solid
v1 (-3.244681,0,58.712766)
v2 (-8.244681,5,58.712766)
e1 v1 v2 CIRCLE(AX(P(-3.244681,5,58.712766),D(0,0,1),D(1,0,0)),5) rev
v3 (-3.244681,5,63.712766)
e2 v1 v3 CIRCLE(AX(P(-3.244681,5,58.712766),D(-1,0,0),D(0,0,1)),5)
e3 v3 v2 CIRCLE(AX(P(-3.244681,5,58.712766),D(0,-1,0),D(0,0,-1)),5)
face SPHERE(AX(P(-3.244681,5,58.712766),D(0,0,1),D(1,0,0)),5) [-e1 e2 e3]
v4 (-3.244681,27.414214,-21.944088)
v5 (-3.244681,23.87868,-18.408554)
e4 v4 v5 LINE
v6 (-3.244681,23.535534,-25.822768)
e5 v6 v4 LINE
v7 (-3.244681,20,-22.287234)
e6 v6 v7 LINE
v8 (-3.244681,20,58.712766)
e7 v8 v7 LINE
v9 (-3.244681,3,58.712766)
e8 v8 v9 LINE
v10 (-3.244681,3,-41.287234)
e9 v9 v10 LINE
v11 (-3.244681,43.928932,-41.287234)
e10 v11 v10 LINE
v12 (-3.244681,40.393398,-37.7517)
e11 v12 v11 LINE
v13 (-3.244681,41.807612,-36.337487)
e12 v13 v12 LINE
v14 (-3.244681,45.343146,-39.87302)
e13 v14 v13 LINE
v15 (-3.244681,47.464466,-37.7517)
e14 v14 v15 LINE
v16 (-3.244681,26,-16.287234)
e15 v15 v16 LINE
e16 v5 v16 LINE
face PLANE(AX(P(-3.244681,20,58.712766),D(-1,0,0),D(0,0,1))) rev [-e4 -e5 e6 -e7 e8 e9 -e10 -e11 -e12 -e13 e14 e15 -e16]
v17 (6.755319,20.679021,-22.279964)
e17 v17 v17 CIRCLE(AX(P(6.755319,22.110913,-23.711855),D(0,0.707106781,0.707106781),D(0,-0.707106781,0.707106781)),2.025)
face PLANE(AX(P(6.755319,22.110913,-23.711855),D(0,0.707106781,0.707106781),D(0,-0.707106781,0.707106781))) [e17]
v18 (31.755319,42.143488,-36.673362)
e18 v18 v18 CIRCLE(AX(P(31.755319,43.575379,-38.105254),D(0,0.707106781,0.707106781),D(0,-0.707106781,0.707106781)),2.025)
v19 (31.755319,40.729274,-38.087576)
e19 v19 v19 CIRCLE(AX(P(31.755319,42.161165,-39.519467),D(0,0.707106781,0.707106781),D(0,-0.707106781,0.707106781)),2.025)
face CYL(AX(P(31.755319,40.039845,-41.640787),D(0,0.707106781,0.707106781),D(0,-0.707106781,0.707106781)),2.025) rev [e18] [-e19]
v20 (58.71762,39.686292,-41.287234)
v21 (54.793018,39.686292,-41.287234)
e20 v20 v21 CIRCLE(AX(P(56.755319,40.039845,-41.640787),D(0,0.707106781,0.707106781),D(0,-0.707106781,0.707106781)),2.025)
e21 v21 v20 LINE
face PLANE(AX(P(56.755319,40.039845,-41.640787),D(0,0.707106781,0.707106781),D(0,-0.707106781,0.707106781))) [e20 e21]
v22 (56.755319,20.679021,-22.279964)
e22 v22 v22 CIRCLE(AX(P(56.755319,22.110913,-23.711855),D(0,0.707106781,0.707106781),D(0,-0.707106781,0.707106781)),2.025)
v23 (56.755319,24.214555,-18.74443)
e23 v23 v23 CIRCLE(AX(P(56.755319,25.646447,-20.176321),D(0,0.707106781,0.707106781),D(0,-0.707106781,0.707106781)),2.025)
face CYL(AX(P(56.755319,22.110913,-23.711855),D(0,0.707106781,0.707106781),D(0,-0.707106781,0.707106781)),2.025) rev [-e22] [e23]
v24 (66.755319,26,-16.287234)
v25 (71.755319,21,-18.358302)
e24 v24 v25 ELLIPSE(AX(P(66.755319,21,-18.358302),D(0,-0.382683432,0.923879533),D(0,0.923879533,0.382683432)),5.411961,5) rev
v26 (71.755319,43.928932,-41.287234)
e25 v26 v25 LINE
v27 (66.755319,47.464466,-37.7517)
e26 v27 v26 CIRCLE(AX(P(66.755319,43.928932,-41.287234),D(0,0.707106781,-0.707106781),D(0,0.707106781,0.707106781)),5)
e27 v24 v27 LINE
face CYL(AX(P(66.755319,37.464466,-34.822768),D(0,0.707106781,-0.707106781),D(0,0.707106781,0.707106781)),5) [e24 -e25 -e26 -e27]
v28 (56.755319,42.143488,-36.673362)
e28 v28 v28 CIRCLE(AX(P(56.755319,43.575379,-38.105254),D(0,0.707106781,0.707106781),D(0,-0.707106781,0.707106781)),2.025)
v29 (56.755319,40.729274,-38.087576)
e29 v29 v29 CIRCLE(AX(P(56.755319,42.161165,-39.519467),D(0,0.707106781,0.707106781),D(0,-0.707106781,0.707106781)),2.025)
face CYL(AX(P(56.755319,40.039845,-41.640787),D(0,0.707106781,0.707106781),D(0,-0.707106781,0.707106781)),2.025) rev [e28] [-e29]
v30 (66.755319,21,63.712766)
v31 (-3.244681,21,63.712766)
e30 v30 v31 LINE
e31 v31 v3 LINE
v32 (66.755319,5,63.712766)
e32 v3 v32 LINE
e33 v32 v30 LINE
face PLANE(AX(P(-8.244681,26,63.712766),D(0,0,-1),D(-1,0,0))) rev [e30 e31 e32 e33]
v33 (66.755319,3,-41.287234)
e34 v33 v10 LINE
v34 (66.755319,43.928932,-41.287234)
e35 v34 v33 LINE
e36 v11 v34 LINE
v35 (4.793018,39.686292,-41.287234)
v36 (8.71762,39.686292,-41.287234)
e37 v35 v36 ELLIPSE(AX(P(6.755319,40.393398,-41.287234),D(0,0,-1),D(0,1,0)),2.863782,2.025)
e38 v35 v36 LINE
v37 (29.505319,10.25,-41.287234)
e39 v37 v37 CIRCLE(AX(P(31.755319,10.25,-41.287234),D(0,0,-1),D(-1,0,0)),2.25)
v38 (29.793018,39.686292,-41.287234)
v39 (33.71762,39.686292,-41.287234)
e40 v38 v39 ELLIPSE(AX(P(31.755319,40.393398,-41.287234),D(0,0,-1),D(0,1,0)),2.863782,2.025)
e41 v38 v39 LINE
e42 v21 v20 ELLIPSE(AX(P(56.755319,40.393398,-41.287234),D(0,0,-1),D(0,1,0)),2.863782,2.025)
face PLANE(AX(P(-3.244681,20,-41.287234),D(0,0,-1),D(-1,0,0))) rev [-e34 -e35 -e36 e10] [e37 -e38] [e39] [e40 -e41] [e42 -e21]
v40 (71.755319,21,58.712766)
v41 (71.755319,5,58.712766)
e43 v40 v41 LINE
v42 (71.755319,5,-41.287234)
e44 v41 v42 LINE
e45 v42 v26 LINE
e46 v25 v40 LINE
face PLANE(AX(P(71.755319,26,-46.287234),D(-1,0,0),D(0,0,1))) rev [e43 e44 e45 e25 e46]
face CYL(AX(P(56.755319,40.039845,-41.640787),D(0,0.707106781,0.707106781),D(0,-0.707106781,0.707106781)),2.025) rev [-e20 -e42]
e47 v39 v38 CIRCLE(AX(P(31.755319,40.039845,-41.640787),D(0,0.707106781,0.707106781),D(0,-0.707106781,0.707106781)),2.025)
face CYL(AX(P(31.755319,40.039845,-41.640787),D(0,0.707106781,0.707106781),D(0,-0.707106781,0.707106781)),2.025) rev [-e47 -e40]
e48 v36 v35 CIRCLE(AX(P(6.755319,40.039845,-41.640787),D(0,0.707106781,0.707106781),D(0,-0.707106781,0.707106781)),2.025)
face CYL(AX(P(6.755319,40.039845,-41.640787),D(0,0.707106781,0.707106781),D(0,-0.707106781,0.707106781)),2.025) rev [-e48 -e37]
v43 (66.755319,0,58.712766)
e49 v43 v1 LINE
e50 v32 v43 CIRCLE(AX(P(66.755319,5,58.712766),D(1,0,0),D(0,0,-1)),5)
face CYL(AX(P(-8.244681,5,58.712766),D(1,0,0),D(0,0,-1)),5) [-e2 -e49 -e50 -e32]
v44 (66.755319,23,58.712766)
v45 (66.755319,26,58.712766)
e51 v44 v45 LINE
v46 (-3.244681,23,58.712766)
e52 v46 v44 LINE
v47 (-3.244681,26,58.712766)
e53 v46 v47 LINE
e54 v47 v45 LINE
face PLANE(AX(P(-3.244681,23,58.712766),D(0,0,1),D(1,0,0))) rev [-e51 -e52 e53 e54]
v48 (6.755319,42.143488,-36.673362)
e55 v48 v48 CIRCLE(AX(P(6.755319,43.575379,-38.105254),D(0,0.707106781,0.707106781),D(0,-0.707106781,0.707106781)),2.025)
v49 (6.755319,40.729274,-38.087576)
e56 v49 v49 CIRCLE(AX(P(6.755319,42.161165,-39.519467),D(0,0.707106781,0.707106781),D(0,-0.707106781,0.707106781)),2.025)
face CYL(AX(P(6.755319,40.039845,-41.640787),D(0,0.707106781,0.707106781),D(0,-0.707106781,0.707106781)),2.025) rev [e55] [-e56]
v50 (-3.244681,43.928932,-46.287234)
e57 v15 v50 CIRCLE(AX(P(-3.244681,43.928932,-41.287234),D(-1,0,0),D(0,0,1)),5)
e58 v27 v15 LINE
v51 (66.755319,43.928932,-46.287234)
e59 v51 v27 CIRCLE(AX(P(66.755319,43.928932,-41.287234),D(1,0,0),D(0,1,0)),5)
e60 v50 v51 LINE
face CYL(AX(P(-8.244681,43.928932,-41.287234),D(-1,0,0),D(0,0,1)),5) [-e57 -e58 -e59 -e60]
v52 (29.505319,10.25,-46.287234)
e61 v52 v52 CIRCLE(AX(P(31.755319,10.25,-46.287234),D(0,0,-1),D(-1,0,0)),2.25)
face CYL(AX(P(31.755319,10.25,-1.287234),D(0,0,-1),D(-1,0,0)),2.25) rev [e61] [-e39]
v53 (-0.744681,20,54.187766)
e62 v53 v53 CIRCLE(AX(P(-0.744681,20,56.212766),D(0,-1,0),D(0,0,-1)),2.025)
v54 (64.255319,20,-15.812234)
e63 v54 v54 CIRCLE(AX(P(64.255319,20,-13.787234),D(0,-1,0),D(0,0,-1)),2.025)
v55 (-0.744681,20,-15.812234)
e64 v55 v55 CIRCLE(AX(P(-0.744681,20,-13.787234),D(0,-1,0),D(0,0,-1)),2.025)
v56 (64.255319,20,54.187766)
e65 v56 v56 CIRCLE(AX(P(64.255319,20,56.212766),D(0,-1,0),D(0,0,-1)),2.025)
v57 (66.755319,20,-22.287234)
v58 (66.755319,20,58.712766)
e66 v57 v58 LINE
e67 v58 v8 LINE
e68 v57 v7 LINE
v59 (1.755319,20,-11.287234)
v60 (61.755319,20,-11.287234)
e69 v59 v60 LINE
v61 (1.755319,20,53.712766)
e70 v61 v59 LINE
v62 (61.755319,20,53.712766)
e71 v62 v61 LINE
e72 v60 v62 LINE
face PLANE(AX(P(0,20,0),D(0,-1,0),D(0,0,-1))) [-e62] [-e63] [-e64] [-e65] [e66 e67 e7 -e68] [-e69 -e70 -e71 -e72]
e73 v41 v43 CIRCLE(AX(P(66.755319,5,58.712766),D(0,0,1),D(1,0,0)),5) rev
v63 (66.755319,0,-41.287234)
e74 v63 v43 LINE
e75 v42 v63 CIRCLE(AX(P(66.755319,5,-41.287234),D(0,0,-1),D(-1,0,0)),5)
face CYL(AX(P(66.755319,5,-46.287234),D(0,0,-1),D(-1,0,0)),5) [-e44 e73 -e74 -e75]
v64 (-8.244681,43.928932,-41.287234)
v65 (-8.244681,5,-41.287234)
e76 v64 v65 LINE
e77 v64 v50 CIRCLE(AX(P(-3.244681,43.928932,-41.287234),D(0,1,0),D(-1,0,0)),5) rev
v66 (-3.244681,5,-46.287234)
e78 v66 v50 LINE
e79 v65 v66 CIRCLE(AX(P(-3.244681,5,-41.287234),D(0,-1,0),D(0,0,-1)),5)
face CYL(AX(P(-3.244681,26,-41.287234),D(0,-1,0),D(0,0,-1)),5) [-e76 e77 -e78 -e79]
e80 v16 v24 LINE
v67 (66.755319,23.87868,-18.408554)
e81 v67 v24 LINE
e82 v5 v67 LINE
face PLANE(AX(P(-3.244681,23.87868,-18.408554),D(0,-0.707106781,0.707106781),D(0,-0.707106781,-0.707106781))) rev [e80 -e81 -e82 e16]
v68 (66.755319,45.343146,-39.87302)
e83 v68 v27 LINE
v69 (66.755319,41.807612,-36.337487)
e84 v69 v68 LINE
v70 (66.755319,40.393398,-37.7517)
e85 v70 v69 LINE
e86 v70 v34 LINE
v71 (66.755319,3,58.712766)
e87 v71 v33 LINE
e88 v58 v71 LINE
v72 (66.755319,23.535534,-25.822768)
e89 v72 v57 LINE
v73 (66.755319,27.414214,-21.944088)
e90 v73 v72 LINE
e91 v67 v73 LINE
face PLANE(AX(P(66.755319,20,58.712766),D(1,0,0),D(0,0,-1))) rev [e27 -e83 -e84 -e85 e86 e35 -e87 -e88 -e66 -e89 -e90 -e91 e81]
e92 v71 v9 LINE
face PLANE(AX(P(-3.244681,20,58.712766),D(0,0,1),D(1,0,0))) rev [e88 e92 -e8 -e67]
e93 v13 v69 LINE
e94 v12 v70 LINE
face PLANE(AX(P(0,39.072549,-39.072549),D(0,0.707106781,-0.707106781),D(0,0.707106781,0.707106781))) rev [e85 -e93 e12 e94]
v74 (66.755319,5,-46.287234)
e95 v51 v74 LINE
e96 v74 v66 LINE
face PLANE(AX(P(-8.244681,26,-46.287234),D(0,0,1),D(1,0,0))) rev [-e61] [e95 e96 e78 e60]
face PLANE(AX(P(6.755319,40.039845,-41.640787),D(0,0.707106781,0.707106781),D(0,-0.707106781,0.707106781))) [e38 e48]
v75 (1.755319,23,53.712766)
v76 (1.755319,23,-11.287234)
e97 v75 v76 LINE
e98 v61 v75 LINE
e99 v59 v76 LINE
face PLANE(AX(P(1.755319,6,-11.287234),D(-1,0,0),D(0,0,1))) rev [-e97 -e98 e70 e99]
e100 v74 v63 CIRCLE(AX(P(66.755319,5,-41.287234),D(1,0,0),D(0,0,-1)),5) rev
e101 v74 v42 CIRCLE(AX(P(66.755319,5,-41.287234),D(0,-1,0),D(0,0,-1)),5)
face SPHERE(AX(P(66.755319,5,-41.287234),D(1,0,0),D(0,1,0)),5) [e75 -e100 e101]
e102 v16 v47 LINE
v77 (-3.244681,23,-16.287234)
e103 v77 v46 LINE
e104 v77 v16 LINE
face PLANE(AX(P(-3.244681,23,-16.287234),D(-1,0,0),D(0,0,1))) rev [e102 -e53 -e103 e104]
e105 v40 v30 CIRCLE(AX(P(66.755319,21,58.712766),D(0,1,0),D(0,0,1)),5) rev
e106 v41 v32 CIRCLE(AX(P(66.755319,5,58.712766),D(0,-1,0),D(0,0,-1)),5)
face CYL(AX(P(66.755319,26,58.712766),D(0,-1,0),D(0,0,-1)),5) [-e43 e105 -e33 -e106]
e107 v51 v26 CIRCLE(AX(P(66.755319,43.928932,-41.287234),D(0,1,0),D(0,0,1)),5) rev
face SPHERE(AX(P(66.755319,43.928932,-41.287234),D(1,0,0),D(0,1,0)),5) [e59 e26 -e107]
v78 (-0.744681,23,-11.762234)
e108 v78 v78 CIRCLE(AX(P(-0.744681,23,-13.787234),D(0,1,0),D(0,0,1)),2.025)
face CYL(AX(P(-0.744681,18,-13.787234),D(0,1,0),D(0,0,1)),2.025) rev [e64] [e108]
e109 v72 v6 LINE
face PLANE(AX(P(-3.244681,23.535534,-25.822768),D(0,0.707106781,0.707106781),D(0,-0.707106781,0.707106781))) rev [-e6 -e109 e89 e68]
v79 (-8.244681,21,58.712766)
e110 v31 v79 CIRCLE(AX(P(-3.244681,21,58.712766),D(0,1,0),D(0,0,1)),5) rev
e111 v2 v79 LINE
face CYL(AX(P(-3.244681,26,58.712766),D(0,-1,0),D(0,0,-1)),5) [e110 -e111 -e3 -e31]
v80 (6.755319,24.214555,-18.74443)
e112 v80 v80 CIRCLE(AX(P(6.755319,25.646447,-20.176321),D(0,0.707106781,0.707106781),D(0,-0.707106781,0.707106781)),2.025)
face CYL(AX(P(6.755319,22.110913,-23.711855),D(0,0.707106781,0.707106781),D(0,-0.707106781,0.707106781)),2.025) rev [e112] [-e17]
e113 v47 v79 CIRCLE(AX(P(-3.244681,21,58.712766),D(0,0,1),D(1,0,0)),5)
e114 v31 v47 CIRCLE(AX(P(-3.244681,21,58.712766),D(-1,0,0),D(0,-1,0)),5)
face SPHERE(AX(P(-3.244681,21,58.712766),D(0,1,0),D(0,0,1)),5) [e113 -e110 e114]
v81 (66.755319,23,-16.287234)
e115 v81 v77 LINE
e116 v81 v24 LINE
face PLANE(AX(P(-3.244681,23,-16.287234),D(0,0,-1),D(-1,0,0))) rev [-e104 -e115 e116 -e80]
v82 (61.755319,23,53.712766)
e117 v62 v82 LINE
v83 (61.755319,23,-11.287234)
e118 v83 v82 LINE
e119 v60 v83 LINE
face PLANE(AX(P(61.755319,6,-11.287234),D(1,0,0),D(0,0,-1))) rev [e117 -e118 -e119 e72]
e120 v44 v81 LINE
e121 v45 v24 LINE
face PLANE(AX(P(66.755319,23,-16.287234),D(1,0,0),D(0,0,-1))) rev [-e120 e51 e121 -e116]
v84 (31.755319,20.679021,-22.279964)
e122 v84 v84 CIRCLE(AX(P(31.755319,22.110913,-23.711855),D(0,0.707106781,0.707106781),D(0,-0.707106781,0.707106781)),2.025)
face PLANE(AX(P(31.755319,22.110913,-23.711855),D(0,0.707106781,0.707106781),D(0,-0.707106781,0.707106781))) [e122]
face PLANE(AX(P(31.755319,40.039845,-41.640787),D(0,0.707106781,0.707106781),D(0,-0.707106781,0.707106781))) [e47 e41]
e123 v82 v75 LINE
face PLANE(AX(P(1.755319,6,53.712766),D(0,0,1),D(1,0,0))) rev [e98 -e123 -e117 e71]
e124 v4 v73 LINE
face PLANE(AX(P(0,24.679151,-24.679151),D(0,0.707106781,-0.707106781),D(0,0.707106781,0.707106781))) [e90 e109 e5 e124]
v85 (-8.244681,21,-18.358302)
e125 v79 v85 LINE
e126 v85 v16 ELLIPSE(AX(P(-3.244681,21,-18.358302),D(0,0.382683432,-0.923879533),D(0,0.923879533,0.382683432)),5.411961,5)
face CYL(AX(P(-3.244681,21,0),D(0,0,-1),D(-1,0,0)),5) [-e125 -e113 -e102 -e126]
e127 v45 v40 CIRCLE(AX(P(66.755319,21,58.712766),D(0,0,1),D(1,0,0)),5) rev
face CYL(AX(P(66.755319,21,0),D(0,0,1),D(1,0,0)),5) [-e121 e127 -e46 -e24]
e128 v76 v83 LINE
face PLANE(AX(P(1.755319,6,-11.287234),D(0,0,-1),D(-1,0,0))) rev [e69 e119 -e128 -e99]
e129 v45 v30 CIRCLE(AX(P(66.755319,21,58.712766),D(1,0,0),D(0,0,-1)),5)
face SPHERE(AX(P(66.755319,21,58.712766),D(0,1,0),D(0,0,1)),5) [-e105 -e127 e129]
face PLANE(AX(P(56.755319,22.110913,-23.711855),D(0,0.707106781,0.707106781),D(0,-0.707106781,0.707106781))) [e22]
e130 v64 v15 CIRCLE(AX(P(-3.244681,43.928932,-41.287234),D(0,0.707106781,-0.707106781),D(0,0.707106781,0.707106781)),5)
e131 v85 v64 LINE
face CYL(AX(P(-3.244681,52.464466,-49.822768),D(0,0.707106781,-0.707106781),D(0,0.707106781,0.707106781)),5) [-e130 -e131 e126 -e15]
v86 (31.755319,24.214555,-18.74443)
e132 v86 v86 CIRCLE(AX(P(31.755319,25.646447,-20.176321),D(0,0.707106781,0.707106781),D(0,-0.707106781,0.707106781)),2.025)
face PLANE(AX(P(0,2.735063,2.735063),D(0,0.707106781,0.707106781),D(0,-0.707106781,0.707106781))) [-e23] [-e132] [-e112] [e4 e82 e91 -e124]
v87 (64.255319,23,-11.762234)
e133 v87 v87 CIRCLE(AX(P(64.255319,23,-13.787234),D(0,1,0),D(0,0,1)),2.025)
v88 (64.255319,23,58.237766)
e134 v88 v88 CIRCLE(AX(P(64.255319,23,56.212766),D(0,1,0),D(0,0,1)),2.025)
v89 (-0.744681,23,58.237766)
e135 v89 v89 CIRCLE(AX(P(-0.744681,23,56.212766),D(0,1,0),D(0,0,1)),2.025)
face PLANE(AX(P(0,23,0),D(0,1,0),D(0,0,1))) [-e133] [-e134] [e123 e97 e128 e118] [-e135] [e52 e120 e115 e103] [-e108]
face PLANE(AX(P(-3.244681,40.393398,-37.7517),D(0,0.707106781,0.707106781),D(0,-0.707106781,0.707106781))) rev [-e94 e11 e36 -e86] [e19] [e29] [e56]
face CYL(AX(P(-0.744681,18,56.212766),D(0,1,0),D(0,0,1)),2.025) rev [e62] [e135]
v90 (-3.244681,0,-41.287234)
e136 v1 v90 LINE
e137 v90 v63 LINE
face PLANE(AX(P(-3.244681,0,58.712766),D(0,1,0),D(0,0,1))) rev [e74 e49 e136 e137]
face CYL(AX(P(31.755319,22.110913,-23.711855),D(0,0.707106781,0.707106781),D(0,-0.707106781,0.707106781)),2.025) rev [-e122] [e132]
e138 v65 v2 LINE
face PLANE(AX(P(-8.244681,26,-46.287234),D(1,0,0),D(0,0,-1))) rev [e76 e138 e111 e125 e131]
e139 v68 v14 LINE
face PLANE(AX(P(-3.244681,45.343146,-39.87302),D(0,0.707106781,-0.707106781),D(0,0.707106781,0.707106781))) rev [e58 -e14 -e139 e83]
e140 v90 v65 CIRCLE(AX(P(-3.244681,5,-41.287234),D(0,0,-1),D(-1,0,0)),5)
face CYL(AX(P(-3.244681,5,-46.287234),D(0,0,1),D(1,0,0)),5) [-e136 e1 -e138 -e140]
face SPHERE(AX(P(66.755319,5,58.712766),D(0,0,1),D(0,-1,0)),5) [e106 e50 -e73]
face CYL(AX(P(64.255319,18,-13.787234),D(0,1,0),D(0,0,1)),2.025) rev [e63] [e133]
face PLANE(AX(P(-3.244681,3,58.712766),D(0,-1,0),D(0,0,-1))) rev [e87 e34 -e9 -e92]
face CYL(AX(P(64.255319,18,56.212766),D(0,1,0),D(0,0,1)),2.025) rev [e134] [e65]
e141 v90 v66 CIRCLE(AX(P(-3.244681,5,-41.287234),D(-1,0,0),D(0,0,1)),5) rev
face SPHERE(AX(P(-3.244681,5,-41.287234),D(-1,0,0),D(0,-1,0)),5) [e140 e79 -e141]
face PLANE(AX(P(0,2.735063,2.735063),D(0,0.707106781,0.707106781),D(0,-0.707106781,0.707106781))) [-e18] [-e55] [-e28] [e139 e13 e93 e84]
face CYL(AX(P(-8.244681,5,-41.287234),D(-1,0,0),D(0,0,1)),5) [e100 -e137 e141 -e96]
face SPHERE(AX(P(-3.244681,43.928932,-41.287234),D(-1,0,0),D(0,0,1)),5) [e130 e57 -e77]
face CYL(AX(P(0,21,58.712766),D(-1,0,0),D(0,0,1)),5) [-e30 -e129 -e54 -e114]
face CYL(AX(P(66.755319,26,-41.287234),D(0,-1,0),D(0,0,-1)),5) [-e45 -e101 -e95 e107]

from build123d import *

# Parameters (mm, degrees)
SKETCH_1_W          = 80
SKETCH_1_H          = 110
EXTRUDE_1_DEPTH     = 26
EXTRUDE_2_DEPTH     = 80
FILLET_1_R          = 5
SKETCH_4_W          = 70
SKETCH_4_H          = 100
CUT_EXTRUDE_1_DEPTH = 20
CUT_EXTRUDE_2_REACH = 129.08
SKETCH_6_W          = 70
SKETCH_6_H          = 30.355339059
SKETCH_8_W          = 60
SKETCH_8_H          = 65
CUT_EXTRUDE_3_DEPTH = 20
SKETCH_9_W          = 70
SKETCH_9_H          = 8.485281375
EXTRUDE_3_DEPTH     = 5
SKETCH_11_W         = 70
SKETCH_11_H         = 5
EXTRUDE_4_DEPTH     = 5
SKETCH_13_W         = 70
SKETCH_13_H         = 75
CUT_EXTRUDE_4_DEPTH = 3
SKETCH_14_W         = 70
SKETCH_14_H         = 30.355339059
CUT_EXTRUDE_5_DEPTH = 3
SKETCH_15_W         = 70
SKETCH_15_H         = 3
EXTRUDE_5_DEPTH     = 100
SKETCH_16_R         = 2.025
CUT_EXTRUDE_6_DEPTH = 5
SKETCH_17_R         = 2.025
CUT_EXTRUDE_7_DEPTH = 5
SKETCH_18_R         = 2.25
CUT_EXTRUDE_8_DEPTH = 45


with BuildPart() as part:
    # 草圖1 → 填料-伸長1 (new body)
    with BuildSketch(Plane(origin=(0, 0, 0), x_dir=(1, 0, 0), z_dir=(0, 1, 0))):
        with Locations((31.755319149, -8.712765957)):
            Rectangle(SKETCH_1_W, SKETCH_1_H)
    extrude(amount=EXTRUDE_1_DEPTH)

    # 草圖2 → 填料-伸長2 (add)
    with BuildSketch(Plane(origin=(71.755319149, 0, 0), x_dir=(0, 0, -1), z_dir=(1, 0, 0))):
        Polygon((46.287234043, 26), (46.287234043, 56), (16.287234043, 26), align=None)
    extrude(amount=-EXTRUDE_2_DEPTH)

    # 圓角1
    fillet_1_edges = [part.edges().sort_by_distance(p)[0] for p in [
        (31.755319149, 26, 63.712765957),
        (71.755319149, 26, 23.712765957),
        (71.755319149, 41, -31.287234043),
        (-8.244680851, 41, -31.287234043),
        (31.755319149, 56, -46.287234043),
        (-8.244680851, 26, 23.712765957),
        (31.755319149, 0, -46.287234043),
        (-8.244680851, 28, -46.287234043),
        (-8.244680851, 0, 8.712765957),
        (71.755319149, 28, -46.287234043),
        (71.755319149, 0, 8.712765957),
        (-8.244680851, 13, 63.712765957),
        (71.755319149, 13, 63.712765957),
        (31.755319149, 0, 63.712765957),
    ]]
    fillet(fillet_1_edges, radius=FILLET_1_R)

    # 草圖4 → 除料-伸長1 (cut)
    with BuildSketch(Plane.XZ):
        with Locations((31.755319149, 8.712765957)):
            Rectangle(SKETCH_4_W, SKETCH_4_H)
    extrude(amount=-CUT_EXTRUDE_1_DEPTH, mode=Mode.SUBTRACT)

    # 除料-伸長2: up to this plane
    cut_extrude_2_end = Plane(origin=(0, 0, -41.287234043), z_dir=(0, 0, -1))
    # 草圖6 → 除料-伸長2 (cut, up to the surface)
    with BuildSketch(Plane(origin=(0, 4.856382979, 4.856382979), x_dir=(1, 0, 0), z_dir=(0, 0.7071067811865439, 0.7071067811865511)), mode=Mode.PRIVATE) as cut_extrude_2_sk1:
        with Locations((31.755319149, 45.079259479)):
            Rectangle(SKETCH_6_W, SKETCH_6_H)
    cut_extrude_2_tool1 = split(extrude(cut_extrude_2_sk1.sketch, amount=-CUT_EXTRUDE_2_REACH, mode=Mode.PRIVATE), bisect_by=cut_extrude_2_end, keep=Keep.BOTH, mode=Mode.PRIVATE)
    add(cut_extrude_2_tool1.solids().sort_by_distance((31.755319, 36.732233, -27.019467))[0], mode=Mode.SUBTRACT)

    # 草圖8 → 除料-伸長3 (cut)
    with BuildSketch(Plane(origin=(0, 26, 0), x_dir=(1, 0, 0), z_dir=(0, 1, 0))):
        with Locations((31.755319149, -21.212765957)):
            Rectangle(SKETCH_8_W, SKETCH_8_H)
    extrude(amount=-CUT_EXTRUDE_3_DEPTH, mode=Mode.SUBTRACT)

    # 草圖9 → 填料-伸長3 (add)
    with BuildSketch(Plane(origin=(0, 21.143617021, -21.143617021), x_dir=(1, 0, 0), z_dir=(0, 0.7071067811865511, -0.707106781186544))):
        with Locations((31.755319149, -2.625321985)):
            Rectangle(SKETCH_9_W, SKETCH_9_H)
    extrude(amount=EXTRUDE_3_DEPTH)

    # 草圖11 → 填料-伸長4 (add)
    with BuildSketch(Plane(origin=(0, 42.608083115, -42.608083115), x_dir=(1, 0, 0), z_dir=(0, -0.7071067811865511, 0.707106781186544))):
        with Locations((31.755319149, 4.367962673)):
            Rectangle(SKETCH_11_W, SKETCH_11_H)
    extrude(amount=EXTRUDE_4_DEPTH)

    # 草圖13 → 除料-伸長4 (cut)
    with BuildSketch(Plane(origin=(0, 26, 0), x_dir=(1, 0, 0), z_dir=(0, 1, 0))):
        with Locations((31.755319149, -21.212765957)):
            Rectangle(SKETCH_13_W, SKETCH_13_H)
    extrude(amount=-CUT_EXTRUDE_4_DEPTH, mode=Mode.SUBTRACT)

    # 草圖14 → 除料-伸長5 (cut)
    with BuildSketch(Plane(origin=(0, 4.856382979, 4.856382979), x_dir=(1, 0, 0), z_dir=(0, 0.7071067811865441, 0.7071067811865509))):
        with Locations((31.755319149, 45.079259479)):
            Rectangle(SKETCH_14_W, SKETCH_14_H)
    extrude(amount=-CUT_EXTRUDE_5_DEPTH, mode=Mode.SUBTRACT)

    # 草圖15 → 填料-伸長5 (add)
    with BuildSketch(Plane.XY.offset(-41.287234043)):
        with Locations((31.755319149, 1.5)):
            Rectangle(SKETCH_15_W, SKETCH_15_H)
    extrude(amount=EXTRUDE_5_DEPTH)

    # 草圖16 → 除料-伸長6 (cut)
    with BuildSketch(Plane(origin=(0, 2.735062635, 2.735062635), x_dir=(1, 0, 0), z_dir=(0, 0.7071067811865444, 0.7071067811865508))):
        with Locations((6.755319149, 57.756929008)):
            Circle(SKETCH_16_R)
        with Locations((56.755319149, 57.756929008)):
            Circle(SKETCH_16_R)
        with Locations((31.755319149, 57.756929008)):
            Circle(SKETCH_16_R)
        with Locations((6.755319149, 32.401589949)):
            Circle(SKETCH_16_R)
        with Locations((56.755319149, 32.401589949)):
            Circle(SKETCH_16_R)
        with Locations((31.755319149, 32.401589949)):
            Circle(SKETCH_16_R)
    extrude(amount=-CUT_EXTRUDE_6_DEPTH, mode=Mode.SUBTRACT)

    # 草圖17 → 除料-伸長7 (cut)
    with BuildSketch(Plane(origin=(0, 23, 0), x_dir=(1, 0, 0), z_dir=(0, 1, 0))):
        with Locations((-0.744680851, 13.787234043)):
            Circle(SKETCH_17_R)
        with Locations((64.255319149, -56.212765957)):
            Circle(SKETCH_17_R)
        with Locations((-0.744680851, -56.212765957)):
            Circle(SKETCH_17_R)
        with Locations((64.255319149, 13.787234043)):
            Circle(SKETCH_17_R)
    extrude(amount=-CUT_EXTRUDE_7_DEPTH, mode=Mode.SUBTRACT)

    # 草圖18 → 除料-伸長8 (cut)
    with BuildSketch(Plane(origin=(0, 0, -46.287234043), x_dir=(-1, 0, 0), z_dir=(0, 0, -1))):
        with Locations((-31.755319149, 10.25)):
            Circle(SKETCH_18_R)
    extrude(amount=-CUT_EXTRUDE_8_DEPTH, mode=Mode.SUBTRACT)


solid = part.part
